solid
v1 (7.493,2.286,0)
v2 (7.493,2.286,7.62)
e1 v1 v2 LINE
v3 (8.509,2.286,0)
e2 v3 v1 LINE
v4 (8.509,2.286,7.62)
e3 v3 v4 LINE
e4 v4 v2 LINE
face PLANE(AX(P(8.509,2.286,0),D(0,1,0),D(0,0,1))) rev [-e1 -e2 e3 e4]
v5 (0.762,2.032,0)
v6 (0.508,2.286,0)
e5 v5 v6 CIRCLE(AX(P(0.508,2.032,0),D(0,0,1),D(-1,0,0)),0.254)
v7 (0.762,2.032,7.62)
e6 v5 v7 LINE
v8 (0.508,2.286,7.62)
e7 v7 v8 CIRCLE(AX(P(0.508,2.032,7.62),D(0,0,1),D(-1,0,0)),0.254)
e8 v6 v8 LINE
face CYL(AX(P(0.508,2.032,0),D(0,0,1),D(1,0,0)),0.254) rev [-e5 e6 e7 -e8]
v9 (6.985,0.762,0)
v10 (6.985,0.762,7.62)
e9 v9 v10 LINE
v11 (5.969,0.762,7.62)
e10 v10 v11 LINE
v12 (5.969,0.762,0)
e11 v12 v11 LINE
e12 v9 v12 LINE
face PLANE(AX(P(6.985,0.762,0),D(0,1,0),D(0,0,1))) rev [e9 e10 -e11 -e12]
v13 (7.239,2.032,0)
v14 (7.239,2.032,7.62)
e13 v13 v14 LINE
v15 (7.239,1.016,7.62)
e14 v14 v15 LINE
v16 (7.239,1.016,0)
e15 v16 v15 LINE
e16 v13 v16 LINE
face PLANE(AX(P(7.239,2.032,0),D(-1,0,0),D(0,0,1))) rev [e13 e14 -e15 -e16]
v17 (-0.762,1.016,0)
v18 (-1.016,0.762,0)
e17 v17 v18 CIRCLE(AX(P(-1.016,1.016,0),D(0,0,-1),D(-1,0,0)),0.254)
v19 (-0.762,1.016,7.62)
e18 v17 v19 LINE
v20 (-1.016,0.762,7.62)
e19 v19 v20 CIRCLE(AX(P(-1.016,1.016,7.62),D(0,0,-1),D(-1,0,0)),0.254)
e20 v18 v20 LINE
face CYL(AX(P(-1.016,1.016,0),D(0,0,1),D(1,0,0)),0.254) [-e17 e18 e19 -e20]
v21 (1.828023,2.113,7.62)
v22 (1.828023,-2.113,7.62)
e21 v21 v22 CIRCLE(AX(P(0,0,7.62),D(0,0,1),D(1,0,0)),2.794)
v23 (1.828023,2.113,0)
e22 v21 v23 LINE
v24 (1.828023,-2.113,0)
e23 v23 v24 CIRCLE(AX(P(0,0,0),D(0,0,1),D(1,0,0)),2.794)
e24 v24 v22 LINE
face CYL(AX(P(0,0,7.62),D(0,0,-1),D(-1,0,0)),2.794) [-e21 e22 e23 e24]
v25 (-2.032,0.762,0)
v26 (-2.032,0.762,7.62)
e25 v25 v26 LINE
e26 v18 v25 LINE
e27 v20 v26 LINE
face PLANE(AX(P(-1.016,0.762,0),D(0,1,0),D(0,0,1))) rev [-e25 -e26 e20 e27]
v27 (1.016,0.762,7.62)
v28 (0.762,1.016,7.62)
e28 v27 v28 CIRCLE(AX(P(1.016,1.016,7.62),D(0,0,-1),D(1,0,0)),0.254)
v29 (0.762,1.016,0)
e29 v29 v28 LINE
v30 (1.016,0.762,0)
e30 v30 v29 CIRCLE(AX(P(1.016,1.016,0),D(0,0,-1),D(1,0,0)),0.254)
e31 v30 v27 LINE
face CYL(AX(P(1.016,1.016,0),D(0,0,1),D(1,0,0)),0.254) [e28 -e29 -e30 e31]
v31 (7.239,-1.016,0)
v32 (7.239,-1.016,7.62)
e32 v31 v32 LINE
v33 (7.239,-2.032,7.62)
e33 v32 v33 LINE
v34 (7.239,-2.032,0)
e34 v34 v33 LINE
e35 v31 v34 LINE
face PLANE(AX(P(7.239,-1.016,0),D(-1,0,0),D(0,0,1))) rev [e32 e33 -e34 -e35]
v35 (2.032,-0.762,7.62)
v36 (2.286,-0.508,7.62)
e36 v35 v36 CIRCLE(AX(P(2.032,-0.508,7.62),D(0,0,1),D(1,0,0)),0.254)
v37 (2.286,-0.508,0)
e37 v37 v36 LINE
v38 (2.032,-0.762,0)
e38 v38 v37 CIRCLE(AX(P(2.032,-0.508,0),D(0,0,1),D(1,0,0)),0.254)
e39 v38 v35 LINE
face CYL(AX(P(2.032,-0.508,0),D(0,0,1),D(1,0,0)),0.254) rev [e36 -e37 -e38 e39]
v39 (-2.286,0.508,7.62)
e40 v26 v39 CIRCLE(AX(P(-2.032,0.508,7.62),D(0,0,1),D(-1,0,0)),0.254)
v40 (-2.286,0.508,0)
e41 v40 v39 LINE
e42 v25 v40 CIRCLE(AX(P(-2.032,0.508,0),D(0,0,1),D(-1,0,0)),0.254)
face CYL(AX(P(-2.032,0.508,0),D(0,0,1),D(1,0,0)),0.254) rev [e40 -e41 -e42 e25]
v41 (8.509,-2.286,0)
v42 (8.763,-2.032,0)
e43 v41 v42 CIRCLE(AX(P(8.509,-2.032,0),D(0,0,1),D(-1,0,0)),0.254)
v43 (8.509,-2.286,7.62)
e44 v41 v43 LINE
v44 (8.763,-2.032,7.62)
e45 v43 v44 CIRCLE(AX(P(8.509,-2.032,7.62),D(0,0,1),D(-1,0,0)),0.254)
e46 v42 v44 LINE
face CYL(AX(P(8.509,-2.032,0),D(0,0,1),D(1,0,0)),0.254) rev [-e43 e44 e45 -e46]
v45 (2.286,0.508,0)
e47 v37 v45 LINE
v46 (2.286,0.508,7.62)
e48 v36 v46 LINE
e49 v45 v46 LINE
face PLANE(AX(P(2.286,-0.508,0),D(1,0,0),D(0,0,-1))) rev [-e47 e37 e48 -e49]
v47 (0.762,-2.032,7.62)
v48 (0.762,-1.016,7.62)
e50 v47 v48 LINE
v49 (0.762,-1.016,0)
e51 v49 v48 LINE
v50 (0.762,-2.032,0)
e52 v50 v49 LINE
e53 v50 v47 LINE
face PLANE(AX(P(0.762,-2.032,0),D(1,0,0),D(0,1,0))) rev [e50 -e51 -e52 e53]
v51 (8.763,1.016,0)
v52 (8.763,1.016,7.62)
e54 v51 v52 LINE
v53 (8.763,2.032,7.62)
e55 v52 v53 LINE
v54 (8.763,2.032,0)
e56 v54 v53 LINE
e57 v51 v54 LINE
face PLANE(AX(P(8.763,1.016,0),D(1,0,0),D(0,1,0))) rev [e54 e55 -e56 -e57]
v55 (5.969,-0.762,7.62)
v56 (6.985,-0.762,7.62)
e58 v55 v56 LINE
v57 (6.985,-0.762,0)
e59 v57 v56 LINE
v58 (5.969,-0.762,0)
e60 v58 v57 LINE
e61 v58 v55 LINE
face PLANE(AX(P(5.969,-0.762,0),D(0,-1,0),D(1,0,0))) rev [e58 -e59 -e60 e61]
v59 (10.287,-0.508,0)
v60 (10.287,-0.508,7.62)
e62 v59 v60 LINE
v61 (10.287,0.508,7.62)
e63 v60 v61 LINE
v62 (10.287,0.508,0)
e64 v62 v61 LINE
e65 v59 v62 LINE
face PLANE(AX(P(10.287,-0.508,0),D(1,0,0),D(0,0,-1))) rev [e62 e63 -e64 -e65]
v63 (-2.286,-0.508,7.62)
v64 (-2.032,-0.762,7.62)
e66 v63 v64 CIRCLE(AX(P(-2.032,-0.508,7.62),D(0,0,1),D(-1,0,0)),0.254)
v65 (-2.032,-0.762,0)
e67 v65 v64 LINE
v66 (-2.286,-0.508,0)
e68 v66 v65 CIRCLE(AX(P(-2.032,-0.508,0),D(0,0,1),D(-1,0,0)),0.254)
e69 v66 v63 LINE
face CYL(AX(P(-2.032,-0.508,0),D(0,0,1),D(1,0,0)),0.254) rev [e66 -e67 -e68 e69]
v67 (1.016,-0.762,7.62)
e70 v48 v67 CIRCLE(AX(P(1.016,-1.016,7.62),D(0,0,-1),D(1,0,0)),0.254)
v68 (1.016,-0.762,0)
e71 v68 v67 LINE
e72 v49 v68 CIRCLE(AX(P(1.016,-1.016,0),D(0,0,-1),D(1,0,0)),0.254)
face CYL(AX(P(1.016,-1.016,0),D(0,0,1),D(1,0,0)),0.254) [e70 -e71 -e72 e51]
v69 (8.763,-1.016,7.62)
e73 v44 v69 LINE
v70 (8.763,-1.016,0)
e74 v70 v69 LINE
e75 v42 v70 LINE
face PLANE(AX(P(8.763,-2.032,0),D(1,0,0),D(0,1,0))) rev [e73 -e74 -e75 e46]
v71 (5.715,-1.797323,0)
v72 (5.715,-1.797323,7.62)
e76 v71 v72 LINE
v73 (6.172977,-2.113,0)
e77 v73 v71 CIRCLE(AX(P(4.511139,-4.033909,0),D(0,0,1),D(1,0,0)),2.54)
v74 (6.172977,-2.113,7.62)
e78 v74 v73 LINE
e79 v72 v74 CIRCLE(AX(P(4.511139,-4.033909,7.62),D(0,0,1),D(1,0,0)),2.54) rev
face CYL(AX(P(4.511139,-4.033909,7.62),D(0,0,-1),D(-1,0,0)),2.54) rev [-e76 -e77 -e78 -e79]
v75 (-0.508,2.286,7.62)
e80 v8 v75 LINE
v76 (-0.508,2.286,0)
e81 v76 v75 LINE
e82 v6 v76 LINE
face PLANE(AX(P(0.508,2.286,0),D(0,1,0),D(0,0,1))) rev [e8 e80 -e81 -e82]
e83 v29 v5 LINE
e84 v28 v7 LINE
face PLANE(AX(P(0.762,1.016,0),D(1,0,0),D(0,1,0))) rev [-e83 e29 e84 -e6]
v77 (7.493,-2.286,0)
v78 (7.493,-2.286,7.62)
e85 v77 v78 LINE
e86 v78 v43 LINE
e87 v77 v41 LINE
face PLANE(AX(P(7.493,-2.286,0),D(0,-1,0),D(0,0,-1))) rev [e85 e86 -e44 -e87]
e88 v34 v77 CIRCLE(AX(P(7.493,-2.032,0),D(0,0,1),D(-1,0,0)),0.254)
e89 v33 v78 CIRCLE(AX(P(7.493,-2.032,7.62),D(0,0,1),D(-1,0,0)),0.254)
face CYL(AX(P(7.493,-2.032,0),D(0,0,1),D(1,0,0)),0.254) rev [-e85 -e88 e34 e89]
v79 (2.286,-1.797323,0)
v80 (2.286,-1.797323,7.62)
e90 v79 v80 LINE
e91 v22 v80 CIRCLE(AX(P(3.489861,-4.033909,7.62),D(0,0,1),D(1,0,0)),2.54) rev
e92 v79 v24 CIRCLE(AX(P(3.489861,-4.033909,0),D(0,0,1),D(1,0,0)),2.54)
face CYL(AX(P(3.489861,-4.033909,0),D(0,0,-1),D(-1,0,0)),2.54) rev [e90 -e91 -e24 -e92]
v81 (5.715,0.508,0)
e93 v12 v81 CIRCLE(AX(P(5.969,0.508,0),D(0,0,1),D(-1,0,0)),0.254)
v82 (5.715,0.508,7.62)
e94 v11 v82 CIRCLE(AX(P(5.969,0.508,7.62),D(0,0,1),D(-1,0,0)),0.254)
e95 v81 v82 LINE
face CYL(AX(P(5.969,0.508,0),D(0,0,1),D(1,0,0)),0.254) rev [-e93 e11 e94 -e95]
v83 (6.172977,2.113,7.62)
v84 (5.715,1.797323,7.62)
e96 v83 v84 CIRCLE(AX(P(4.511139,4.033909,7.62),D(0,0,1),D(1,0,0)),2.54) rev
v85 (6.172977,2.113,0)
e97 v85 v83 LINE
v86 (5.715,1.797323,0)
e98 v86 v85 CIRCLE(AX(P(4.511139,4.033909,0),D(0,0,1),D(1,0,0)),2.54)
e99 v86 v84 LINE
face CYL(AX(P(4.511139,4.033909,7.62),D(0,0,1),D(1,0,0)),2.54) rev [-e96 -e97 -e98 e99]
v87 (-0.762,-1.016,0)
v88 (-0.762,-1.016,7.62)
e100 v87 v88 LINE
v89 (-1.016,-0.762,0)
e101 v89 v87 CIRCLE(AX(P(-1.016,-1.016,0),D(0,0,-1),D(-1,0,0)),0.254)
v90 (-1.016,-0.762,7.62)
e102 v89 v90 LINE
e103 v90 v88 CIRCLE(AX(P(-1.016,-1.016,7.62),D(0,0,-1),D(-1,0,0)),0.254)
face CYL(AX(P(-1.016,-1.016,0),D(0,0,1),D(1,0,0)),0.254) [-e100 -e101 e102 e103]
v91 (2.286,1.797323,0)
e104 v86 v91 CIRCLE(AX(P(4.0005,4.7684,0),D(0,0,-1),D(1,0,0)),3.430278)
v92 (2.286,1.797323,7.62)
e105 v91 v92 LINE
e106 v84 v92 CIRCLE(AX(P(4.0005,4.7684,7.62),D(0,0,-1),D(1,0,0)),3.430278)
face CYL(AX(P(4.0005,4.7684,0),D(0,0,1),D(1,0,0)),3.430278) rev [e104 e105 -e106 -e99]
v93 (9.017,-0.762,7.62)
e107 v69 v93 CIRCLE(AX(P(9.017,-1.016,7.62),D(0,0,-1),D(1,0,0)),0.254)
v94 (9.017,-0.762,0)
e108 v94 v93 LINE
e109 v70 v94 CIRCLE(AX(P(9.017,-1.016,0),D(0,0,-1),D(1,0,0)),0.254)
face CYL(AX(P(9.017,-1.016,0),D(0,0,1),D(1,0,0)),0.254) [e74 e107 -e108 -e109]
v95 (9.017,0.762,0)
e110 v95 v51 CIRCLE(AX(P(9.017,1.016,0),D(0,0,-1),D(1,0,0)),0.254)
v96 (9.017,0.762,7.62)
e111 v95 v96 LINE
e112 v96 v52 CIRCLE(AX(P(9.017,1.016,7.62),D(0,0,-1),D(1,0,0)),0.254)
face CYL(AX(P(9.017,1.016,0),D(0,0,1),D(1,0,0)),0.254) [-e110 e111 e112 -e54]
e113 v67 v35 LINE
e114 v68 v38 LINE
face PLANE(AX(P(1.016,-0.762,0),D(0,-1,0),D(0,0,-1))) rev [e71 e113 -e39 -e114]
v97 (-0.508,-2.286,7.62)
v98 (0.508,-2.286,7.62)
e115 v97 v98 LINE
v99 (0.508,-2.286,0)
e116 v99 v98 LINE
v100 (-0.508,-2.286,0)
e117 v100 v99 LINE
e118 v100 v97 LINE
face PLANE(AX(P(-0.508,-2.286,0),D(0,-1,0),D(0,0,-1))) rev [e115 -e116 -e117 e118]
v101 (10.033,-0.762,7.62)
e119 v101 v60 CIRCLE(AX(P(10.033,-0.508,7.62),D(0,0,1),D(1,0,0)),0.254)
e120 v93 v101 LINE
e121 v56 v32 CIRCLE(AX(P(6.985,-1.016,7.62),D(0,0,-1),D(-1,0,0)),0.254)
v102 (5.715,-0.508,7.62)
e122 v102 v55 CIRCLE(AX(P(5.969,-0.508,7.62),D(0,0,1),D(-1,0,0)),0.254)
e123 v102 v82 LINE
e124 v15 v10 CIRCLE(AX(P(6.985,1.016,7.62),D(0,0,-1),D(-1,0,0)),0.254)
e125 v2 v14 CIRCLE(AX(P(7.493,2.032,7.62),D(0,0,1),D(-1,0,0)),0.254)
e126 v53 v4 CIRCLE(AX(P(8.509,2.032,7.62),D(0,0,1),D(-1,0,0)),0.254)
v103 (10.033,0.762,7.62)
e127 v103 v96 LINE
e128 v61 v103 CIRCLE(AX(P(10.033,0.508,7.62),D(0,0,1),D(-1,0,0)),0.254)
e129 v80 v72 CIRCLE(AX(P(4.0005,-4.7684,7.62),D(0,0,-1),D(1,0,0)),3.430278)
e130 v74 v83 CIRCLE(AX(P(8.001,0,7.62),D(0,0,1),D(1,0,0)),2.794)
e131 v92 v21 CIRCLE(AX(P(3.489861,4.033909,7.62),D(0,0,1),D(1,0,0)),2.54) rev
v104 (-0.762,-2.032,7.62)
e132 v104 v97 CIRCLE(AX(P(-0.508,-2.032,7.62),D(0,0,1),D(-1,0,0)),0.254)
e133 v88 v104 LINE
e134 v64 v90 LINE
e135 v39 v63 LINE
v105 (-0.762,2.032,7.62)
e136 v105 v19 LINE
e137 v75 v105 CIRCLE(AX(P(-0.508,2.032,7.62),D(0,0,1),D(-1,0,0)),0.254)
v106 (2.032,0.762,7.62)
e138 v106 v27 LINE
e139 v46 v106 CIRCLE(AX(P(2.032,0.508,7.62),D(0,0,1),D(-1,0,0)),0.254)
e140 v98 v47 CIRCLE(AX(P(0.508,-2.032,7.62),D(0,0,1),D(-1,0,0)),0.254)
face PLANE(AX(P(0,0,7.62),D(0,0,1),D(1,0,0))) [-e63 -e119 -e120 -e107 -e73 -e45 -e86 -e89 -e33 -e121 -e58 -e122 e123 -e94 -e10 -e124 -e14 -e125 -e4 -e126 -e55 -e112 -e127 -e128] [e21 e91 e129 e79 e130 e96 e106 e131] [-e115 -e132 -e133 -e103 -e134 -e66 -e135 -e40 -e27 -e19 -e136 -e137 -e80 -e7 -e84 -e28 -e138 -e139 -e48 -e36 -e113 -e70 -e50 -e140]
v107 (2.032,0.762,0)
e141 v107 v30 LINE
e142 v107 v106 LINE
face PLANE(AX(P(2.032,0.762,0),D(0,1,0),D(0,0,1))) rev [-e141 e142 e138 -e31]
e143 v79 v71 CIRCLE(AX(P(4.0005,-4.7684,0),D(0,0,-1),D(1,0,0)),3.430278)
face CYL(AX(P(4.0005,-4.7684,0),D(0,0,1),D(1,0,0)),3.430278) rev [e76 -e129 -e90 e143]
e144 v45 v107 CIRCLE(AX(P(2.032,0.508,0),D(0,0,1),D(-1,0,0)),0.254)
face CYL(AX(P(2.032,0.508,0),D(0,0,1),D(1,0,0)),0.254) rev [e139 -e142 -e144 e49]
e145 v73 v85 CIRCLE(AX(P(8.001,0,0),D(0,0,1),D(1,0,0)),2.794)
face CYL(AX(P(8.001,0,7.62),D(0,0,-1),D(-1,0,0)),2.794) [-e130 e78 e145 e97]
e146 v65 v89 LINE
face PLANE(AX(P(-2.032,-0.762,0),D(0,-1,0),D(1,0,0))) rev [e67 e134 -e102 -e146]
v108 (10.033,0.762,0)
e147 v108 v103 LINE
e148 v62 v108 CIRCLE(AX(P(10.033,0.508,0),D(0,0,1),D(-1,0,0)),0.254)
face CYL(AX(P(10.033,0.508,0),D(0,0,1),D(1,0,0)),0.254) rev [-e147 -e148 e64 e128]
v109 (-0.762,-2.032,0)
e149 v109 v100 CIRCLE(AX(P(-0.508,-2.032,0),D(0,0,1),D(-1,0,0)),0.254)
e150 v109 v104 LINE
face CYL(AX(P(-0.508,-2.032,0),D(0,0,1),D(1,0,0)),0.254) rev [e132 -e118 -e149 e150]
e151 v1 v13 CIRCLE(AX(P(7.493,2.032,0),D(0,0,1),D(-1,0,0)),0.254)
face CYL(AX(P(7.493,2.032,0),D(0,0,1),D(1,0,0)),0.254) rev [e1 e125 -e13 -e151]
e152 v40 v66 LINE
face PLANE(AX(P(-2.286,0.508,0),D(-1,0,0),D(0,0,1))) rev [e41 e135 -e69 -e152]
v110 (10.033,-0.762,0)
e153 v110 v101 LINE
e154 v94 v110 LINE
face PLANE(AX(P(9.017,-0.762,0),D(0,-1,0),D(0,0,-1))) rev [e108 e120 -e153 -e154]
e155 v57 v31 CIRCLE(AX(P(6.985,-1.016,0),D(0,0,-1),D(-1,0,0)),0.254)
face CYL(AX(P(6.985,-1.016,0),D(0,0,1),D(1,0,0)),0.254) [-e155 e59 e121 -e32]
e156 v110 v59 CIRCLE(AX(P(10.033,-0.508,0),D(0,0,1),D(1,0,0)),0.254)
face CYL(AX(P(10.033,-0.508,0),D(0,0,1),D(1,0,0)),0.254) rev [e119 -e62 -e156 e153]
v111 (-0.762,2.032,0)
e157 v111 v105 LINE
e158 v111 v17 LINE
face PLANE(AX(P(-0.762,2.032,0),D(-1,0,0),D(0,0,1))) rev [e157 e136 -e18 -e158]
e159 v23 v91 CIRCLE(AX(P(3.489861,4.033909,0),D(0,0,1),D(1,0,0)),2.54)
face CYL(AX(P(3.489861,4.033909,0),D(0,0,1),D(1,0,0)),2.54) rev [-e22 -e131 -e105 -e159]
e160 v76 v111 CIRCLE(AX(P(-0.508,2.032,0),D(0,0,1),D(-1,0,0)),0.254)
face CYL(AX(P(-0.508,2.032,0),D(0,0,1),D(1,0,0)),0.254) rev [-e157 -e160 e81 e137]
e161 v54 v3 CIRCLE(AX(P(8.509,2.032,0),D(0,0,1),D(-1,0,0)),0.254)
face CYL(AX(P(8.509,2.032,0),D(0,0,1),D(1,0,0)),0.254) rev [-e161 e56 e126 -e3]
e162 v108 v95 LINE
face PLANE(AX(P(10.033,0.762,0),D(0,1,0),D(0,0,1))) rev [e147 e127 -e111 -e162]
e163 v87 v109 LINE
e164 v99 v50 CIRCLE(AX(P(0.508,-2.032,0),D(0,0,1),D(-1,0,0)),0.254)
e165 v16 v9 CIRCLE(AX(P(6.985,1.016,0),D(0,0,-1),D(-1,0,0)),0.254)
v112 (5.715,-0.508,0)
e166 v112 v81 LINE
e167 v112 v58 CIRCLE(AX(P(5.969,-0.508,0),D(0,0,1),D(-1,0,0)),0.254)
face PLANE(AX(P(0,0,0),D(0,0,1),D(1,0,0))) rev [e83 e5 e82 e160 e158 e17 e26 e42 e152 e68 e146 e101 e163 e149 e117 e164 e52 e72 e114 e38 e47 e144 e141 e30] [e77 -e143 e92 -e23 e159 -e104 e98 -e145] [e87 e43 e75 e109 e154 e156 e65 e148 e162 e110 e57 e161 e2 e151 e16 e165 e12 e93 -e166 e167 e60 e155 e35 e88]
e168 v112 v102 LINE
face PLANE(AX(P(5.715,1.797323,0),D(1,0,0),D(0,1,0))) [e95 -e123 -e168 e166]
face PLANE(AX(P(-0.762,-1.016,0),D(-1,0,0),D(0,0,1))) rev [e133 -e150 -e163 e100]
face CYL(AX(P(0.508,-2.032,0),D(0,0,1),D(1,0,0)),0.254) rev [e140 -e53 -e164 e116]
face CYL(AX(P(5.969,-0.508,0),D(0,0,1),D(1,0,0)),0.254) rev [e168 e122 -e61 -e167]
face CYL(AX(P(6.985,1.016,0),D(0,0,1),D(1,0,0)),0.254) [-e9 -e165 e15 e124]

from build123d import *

# Parameters (mm, degrees)
SKETCH2_R          = 2.794
EXTRUDE1_DEPTH     = 7.62
CUT_EXTRUDE1_DEPTH = 9.583546586
LPATTERN1_COUNT    = 2
LPATTERN1_PITCH    = 8.001
EXTRUDE3_DEPTH     = 7.62
FILLET1_R          = 2.54


with BuildPart() as part:
    # Sketch2 → Extrude1 (new body)
    with BuildSketch(Plane.XY):
        with Locations(Location((0, 0, 0), (0, 0, 180))):
            Circle(SKETCH2_R)
    extrude(amount=EXTRUDE1_DEPTH)

    # Sketch3 → Cut-Extrude1 (cut, through all)
    with BuildSketch(Plane.XY.offset(7.62)):
        with BuildLine():
            Line((-0.762, 2.032), (-0.762, 1.016))
            ThreePointArc((-0.762, 1.016), (-0.836394878, 0.836394878), (-1.016, 0.762))
            Line((-1.016, 0.762), (-2.032, 0.762))
            ThreePointArc((-2.032, 0.762), (-2.211605122, 0.687605122), (-2.286, 0.508))
            Line((-2.286, 0.508), (-2.286, -0.508))
            ThreePointArc((-2.286, -0.508), (-2.211605122, -0.687605122), (-2.032, -0.762))
            Line((-2.032, -0.762), (-1.016, -0.762))
            ThreePointArc((-1.016, -0.762), (-0.836394878, -0.836394878), (-0.762, -1.016))
            Line((-0.762, -1.016), (-0.762, -2.032))
            ThreePointArc((-0.762, -2.032), (-0.687605122, -2.211605122), (-0.508, -2.286))
            Line((-0.508, -2.286), (0.508, -2.286))
            ThreePointArc((0.508, -2.286), (0.687605122, -2.211605122), (0.762, -2.032))
            Line((0.762, -2.032), (0.762, -1.016))
            ThreePointArc((0.762, -1.016), (0.836394878, -0.836394878), (1.016, -0.762))
            Line((1.016, -0.762), (2.032, -0.762))
            ThreePointArc((2.032, -0.762), (2.211605122, -0.687605122), (2.286, -0.508))
            Line((2.286, -0.508), (2.286, 0.508))
            ThreePointArc((2.286, 0.508), (2.211605122, 0.687605122), (2.032, 0.762))
            Line((2.032, 0.762), (1.016, 0.762))
            ThreePointArc((1.016, 0.762), (0.836394878, 0.836394878), (0.762, 1.016))
            Line((0.762, 1.016), (0.762, 2.032))
            ThreePointArc((0.762, 2.032), (0.687605122, 2.211605122), (0.508, 2.286))
            Line((0.508, 2.286), (-0.508, 2.286))
            ThreePointArc((-0.508, 2.286), (-0.687605122, 2.211605122), (-0.762, 2.032))
        make_face()
    extrude(amount=-CUT_EXTRUDE1_DEPTH, mode=Mode.SUBTRACT)


with BuildPart() as lpattern1_1:
    # LPattern1: pattern copy
    add(part.part.moved(Location(Vector(1, 0, 0) * (1 * LPATTERN1_PITCH))))


with BuildPart() as part_1:
    add(part.part)

    add(lpattern1_1.part)  # Extrude3 merges LPattern1_1
    # Sketch5 → Extrude3 (add, through all)
    with BuildSketch(Plane.XY.offset(7.62)):
        with BuildLine():
            Line((2.286, 1.797323066), (2.286, -1.797323066))
            ThreePointArc((2.286, -1.797323066), (4.0005, -1.338121812), (5.715, -1.797323066))
            Line((5.715, -1.797323066), (5.715, 1.797323066))
            ThreePointArc((5.715, 1.797323066), (4.0005, 1.338121812), (2.286, 1.797323066))
        make_face()
    extrude(amount=-EXTRUDE3_DEPTH)

    # Fillet1
    # the kernel refuses this fillet: 2.54 mm, written as the material it adds along each edge
    with BuildSketch(Plane(origin=(2.286, 1.606437051, 7.62), x_dir=(-0.6706382745586644, 0.7417845406160589, 0), z_dir=(0, 0, -1))) as fillet1_piece_1:
        with BuildLine():
            CenterArc((0.993305965, 2.520961484), FILLET1_R, 250.408076785, 12.572378174)
            Line((0.141596295, 0.128015467), (0, 0))
            ThreePointArc((0, 0), (0.341448925, 0.020942368), (0.682897851, 0))
        make_face()
    extrude(amount=7.62)
    with BuildSketch(Plane(origin=(2.286, -1.606437051, 7.62), x_dir=(-0.6706382745586632, -0.7417845406160598, 0), z_dir=(0, 0, -1))) as fillet1_piece_2:
        with BuildLine():
            CenterArc((0.993305965, -2.520961484), FILLET1_R, 97.019545041, 12.572378174)
            Line((0.141596295, -0.128015467), (0, 0))
            ThreePointArc((0, 0), (0.341448925, -0.020942368), (0.682897851, 0))
        make_face()
    extrude(amount=7.62)
    with BuildSketch(Plane(origin=(5.715, -1.606437051, 7.62), x_dir=(0, -1, 0), z_dir=(0, 0, -1))) as fillet1_piece_3:
        with BuildLine():
            CenterArc((2.427472269, 1.203861258), FILLET1_R, 208.291730517, 12.572378174)
            ThreePointArc((0.506563069, -0.457977436), (0.267326288, -0.213453994), (0, 0))
            Line((0, 0), (0.190886015, 0))
        make_face()
    extrude(amount=7.62)
    with BuildSketch(Plane(origin=(5.715, 1.606437051, 7.62), x_dir=(0, 1, 0), z_dir=(0, 0, -1))) as fillet1_piece_4:
        with BuildLine():
            CenterArc((2.427472269, -1.203861258), FILLET1_R, 139.135891309, 12.572378174)
            ThreePointArc((0.506563069, 0.457977436), (0.267326288, 0.213453994), (0, 0))
            Line((0, 0), (0.190886015, 0))
        make_face()
    extrude(amount=7.62)


solid = part_1.part
